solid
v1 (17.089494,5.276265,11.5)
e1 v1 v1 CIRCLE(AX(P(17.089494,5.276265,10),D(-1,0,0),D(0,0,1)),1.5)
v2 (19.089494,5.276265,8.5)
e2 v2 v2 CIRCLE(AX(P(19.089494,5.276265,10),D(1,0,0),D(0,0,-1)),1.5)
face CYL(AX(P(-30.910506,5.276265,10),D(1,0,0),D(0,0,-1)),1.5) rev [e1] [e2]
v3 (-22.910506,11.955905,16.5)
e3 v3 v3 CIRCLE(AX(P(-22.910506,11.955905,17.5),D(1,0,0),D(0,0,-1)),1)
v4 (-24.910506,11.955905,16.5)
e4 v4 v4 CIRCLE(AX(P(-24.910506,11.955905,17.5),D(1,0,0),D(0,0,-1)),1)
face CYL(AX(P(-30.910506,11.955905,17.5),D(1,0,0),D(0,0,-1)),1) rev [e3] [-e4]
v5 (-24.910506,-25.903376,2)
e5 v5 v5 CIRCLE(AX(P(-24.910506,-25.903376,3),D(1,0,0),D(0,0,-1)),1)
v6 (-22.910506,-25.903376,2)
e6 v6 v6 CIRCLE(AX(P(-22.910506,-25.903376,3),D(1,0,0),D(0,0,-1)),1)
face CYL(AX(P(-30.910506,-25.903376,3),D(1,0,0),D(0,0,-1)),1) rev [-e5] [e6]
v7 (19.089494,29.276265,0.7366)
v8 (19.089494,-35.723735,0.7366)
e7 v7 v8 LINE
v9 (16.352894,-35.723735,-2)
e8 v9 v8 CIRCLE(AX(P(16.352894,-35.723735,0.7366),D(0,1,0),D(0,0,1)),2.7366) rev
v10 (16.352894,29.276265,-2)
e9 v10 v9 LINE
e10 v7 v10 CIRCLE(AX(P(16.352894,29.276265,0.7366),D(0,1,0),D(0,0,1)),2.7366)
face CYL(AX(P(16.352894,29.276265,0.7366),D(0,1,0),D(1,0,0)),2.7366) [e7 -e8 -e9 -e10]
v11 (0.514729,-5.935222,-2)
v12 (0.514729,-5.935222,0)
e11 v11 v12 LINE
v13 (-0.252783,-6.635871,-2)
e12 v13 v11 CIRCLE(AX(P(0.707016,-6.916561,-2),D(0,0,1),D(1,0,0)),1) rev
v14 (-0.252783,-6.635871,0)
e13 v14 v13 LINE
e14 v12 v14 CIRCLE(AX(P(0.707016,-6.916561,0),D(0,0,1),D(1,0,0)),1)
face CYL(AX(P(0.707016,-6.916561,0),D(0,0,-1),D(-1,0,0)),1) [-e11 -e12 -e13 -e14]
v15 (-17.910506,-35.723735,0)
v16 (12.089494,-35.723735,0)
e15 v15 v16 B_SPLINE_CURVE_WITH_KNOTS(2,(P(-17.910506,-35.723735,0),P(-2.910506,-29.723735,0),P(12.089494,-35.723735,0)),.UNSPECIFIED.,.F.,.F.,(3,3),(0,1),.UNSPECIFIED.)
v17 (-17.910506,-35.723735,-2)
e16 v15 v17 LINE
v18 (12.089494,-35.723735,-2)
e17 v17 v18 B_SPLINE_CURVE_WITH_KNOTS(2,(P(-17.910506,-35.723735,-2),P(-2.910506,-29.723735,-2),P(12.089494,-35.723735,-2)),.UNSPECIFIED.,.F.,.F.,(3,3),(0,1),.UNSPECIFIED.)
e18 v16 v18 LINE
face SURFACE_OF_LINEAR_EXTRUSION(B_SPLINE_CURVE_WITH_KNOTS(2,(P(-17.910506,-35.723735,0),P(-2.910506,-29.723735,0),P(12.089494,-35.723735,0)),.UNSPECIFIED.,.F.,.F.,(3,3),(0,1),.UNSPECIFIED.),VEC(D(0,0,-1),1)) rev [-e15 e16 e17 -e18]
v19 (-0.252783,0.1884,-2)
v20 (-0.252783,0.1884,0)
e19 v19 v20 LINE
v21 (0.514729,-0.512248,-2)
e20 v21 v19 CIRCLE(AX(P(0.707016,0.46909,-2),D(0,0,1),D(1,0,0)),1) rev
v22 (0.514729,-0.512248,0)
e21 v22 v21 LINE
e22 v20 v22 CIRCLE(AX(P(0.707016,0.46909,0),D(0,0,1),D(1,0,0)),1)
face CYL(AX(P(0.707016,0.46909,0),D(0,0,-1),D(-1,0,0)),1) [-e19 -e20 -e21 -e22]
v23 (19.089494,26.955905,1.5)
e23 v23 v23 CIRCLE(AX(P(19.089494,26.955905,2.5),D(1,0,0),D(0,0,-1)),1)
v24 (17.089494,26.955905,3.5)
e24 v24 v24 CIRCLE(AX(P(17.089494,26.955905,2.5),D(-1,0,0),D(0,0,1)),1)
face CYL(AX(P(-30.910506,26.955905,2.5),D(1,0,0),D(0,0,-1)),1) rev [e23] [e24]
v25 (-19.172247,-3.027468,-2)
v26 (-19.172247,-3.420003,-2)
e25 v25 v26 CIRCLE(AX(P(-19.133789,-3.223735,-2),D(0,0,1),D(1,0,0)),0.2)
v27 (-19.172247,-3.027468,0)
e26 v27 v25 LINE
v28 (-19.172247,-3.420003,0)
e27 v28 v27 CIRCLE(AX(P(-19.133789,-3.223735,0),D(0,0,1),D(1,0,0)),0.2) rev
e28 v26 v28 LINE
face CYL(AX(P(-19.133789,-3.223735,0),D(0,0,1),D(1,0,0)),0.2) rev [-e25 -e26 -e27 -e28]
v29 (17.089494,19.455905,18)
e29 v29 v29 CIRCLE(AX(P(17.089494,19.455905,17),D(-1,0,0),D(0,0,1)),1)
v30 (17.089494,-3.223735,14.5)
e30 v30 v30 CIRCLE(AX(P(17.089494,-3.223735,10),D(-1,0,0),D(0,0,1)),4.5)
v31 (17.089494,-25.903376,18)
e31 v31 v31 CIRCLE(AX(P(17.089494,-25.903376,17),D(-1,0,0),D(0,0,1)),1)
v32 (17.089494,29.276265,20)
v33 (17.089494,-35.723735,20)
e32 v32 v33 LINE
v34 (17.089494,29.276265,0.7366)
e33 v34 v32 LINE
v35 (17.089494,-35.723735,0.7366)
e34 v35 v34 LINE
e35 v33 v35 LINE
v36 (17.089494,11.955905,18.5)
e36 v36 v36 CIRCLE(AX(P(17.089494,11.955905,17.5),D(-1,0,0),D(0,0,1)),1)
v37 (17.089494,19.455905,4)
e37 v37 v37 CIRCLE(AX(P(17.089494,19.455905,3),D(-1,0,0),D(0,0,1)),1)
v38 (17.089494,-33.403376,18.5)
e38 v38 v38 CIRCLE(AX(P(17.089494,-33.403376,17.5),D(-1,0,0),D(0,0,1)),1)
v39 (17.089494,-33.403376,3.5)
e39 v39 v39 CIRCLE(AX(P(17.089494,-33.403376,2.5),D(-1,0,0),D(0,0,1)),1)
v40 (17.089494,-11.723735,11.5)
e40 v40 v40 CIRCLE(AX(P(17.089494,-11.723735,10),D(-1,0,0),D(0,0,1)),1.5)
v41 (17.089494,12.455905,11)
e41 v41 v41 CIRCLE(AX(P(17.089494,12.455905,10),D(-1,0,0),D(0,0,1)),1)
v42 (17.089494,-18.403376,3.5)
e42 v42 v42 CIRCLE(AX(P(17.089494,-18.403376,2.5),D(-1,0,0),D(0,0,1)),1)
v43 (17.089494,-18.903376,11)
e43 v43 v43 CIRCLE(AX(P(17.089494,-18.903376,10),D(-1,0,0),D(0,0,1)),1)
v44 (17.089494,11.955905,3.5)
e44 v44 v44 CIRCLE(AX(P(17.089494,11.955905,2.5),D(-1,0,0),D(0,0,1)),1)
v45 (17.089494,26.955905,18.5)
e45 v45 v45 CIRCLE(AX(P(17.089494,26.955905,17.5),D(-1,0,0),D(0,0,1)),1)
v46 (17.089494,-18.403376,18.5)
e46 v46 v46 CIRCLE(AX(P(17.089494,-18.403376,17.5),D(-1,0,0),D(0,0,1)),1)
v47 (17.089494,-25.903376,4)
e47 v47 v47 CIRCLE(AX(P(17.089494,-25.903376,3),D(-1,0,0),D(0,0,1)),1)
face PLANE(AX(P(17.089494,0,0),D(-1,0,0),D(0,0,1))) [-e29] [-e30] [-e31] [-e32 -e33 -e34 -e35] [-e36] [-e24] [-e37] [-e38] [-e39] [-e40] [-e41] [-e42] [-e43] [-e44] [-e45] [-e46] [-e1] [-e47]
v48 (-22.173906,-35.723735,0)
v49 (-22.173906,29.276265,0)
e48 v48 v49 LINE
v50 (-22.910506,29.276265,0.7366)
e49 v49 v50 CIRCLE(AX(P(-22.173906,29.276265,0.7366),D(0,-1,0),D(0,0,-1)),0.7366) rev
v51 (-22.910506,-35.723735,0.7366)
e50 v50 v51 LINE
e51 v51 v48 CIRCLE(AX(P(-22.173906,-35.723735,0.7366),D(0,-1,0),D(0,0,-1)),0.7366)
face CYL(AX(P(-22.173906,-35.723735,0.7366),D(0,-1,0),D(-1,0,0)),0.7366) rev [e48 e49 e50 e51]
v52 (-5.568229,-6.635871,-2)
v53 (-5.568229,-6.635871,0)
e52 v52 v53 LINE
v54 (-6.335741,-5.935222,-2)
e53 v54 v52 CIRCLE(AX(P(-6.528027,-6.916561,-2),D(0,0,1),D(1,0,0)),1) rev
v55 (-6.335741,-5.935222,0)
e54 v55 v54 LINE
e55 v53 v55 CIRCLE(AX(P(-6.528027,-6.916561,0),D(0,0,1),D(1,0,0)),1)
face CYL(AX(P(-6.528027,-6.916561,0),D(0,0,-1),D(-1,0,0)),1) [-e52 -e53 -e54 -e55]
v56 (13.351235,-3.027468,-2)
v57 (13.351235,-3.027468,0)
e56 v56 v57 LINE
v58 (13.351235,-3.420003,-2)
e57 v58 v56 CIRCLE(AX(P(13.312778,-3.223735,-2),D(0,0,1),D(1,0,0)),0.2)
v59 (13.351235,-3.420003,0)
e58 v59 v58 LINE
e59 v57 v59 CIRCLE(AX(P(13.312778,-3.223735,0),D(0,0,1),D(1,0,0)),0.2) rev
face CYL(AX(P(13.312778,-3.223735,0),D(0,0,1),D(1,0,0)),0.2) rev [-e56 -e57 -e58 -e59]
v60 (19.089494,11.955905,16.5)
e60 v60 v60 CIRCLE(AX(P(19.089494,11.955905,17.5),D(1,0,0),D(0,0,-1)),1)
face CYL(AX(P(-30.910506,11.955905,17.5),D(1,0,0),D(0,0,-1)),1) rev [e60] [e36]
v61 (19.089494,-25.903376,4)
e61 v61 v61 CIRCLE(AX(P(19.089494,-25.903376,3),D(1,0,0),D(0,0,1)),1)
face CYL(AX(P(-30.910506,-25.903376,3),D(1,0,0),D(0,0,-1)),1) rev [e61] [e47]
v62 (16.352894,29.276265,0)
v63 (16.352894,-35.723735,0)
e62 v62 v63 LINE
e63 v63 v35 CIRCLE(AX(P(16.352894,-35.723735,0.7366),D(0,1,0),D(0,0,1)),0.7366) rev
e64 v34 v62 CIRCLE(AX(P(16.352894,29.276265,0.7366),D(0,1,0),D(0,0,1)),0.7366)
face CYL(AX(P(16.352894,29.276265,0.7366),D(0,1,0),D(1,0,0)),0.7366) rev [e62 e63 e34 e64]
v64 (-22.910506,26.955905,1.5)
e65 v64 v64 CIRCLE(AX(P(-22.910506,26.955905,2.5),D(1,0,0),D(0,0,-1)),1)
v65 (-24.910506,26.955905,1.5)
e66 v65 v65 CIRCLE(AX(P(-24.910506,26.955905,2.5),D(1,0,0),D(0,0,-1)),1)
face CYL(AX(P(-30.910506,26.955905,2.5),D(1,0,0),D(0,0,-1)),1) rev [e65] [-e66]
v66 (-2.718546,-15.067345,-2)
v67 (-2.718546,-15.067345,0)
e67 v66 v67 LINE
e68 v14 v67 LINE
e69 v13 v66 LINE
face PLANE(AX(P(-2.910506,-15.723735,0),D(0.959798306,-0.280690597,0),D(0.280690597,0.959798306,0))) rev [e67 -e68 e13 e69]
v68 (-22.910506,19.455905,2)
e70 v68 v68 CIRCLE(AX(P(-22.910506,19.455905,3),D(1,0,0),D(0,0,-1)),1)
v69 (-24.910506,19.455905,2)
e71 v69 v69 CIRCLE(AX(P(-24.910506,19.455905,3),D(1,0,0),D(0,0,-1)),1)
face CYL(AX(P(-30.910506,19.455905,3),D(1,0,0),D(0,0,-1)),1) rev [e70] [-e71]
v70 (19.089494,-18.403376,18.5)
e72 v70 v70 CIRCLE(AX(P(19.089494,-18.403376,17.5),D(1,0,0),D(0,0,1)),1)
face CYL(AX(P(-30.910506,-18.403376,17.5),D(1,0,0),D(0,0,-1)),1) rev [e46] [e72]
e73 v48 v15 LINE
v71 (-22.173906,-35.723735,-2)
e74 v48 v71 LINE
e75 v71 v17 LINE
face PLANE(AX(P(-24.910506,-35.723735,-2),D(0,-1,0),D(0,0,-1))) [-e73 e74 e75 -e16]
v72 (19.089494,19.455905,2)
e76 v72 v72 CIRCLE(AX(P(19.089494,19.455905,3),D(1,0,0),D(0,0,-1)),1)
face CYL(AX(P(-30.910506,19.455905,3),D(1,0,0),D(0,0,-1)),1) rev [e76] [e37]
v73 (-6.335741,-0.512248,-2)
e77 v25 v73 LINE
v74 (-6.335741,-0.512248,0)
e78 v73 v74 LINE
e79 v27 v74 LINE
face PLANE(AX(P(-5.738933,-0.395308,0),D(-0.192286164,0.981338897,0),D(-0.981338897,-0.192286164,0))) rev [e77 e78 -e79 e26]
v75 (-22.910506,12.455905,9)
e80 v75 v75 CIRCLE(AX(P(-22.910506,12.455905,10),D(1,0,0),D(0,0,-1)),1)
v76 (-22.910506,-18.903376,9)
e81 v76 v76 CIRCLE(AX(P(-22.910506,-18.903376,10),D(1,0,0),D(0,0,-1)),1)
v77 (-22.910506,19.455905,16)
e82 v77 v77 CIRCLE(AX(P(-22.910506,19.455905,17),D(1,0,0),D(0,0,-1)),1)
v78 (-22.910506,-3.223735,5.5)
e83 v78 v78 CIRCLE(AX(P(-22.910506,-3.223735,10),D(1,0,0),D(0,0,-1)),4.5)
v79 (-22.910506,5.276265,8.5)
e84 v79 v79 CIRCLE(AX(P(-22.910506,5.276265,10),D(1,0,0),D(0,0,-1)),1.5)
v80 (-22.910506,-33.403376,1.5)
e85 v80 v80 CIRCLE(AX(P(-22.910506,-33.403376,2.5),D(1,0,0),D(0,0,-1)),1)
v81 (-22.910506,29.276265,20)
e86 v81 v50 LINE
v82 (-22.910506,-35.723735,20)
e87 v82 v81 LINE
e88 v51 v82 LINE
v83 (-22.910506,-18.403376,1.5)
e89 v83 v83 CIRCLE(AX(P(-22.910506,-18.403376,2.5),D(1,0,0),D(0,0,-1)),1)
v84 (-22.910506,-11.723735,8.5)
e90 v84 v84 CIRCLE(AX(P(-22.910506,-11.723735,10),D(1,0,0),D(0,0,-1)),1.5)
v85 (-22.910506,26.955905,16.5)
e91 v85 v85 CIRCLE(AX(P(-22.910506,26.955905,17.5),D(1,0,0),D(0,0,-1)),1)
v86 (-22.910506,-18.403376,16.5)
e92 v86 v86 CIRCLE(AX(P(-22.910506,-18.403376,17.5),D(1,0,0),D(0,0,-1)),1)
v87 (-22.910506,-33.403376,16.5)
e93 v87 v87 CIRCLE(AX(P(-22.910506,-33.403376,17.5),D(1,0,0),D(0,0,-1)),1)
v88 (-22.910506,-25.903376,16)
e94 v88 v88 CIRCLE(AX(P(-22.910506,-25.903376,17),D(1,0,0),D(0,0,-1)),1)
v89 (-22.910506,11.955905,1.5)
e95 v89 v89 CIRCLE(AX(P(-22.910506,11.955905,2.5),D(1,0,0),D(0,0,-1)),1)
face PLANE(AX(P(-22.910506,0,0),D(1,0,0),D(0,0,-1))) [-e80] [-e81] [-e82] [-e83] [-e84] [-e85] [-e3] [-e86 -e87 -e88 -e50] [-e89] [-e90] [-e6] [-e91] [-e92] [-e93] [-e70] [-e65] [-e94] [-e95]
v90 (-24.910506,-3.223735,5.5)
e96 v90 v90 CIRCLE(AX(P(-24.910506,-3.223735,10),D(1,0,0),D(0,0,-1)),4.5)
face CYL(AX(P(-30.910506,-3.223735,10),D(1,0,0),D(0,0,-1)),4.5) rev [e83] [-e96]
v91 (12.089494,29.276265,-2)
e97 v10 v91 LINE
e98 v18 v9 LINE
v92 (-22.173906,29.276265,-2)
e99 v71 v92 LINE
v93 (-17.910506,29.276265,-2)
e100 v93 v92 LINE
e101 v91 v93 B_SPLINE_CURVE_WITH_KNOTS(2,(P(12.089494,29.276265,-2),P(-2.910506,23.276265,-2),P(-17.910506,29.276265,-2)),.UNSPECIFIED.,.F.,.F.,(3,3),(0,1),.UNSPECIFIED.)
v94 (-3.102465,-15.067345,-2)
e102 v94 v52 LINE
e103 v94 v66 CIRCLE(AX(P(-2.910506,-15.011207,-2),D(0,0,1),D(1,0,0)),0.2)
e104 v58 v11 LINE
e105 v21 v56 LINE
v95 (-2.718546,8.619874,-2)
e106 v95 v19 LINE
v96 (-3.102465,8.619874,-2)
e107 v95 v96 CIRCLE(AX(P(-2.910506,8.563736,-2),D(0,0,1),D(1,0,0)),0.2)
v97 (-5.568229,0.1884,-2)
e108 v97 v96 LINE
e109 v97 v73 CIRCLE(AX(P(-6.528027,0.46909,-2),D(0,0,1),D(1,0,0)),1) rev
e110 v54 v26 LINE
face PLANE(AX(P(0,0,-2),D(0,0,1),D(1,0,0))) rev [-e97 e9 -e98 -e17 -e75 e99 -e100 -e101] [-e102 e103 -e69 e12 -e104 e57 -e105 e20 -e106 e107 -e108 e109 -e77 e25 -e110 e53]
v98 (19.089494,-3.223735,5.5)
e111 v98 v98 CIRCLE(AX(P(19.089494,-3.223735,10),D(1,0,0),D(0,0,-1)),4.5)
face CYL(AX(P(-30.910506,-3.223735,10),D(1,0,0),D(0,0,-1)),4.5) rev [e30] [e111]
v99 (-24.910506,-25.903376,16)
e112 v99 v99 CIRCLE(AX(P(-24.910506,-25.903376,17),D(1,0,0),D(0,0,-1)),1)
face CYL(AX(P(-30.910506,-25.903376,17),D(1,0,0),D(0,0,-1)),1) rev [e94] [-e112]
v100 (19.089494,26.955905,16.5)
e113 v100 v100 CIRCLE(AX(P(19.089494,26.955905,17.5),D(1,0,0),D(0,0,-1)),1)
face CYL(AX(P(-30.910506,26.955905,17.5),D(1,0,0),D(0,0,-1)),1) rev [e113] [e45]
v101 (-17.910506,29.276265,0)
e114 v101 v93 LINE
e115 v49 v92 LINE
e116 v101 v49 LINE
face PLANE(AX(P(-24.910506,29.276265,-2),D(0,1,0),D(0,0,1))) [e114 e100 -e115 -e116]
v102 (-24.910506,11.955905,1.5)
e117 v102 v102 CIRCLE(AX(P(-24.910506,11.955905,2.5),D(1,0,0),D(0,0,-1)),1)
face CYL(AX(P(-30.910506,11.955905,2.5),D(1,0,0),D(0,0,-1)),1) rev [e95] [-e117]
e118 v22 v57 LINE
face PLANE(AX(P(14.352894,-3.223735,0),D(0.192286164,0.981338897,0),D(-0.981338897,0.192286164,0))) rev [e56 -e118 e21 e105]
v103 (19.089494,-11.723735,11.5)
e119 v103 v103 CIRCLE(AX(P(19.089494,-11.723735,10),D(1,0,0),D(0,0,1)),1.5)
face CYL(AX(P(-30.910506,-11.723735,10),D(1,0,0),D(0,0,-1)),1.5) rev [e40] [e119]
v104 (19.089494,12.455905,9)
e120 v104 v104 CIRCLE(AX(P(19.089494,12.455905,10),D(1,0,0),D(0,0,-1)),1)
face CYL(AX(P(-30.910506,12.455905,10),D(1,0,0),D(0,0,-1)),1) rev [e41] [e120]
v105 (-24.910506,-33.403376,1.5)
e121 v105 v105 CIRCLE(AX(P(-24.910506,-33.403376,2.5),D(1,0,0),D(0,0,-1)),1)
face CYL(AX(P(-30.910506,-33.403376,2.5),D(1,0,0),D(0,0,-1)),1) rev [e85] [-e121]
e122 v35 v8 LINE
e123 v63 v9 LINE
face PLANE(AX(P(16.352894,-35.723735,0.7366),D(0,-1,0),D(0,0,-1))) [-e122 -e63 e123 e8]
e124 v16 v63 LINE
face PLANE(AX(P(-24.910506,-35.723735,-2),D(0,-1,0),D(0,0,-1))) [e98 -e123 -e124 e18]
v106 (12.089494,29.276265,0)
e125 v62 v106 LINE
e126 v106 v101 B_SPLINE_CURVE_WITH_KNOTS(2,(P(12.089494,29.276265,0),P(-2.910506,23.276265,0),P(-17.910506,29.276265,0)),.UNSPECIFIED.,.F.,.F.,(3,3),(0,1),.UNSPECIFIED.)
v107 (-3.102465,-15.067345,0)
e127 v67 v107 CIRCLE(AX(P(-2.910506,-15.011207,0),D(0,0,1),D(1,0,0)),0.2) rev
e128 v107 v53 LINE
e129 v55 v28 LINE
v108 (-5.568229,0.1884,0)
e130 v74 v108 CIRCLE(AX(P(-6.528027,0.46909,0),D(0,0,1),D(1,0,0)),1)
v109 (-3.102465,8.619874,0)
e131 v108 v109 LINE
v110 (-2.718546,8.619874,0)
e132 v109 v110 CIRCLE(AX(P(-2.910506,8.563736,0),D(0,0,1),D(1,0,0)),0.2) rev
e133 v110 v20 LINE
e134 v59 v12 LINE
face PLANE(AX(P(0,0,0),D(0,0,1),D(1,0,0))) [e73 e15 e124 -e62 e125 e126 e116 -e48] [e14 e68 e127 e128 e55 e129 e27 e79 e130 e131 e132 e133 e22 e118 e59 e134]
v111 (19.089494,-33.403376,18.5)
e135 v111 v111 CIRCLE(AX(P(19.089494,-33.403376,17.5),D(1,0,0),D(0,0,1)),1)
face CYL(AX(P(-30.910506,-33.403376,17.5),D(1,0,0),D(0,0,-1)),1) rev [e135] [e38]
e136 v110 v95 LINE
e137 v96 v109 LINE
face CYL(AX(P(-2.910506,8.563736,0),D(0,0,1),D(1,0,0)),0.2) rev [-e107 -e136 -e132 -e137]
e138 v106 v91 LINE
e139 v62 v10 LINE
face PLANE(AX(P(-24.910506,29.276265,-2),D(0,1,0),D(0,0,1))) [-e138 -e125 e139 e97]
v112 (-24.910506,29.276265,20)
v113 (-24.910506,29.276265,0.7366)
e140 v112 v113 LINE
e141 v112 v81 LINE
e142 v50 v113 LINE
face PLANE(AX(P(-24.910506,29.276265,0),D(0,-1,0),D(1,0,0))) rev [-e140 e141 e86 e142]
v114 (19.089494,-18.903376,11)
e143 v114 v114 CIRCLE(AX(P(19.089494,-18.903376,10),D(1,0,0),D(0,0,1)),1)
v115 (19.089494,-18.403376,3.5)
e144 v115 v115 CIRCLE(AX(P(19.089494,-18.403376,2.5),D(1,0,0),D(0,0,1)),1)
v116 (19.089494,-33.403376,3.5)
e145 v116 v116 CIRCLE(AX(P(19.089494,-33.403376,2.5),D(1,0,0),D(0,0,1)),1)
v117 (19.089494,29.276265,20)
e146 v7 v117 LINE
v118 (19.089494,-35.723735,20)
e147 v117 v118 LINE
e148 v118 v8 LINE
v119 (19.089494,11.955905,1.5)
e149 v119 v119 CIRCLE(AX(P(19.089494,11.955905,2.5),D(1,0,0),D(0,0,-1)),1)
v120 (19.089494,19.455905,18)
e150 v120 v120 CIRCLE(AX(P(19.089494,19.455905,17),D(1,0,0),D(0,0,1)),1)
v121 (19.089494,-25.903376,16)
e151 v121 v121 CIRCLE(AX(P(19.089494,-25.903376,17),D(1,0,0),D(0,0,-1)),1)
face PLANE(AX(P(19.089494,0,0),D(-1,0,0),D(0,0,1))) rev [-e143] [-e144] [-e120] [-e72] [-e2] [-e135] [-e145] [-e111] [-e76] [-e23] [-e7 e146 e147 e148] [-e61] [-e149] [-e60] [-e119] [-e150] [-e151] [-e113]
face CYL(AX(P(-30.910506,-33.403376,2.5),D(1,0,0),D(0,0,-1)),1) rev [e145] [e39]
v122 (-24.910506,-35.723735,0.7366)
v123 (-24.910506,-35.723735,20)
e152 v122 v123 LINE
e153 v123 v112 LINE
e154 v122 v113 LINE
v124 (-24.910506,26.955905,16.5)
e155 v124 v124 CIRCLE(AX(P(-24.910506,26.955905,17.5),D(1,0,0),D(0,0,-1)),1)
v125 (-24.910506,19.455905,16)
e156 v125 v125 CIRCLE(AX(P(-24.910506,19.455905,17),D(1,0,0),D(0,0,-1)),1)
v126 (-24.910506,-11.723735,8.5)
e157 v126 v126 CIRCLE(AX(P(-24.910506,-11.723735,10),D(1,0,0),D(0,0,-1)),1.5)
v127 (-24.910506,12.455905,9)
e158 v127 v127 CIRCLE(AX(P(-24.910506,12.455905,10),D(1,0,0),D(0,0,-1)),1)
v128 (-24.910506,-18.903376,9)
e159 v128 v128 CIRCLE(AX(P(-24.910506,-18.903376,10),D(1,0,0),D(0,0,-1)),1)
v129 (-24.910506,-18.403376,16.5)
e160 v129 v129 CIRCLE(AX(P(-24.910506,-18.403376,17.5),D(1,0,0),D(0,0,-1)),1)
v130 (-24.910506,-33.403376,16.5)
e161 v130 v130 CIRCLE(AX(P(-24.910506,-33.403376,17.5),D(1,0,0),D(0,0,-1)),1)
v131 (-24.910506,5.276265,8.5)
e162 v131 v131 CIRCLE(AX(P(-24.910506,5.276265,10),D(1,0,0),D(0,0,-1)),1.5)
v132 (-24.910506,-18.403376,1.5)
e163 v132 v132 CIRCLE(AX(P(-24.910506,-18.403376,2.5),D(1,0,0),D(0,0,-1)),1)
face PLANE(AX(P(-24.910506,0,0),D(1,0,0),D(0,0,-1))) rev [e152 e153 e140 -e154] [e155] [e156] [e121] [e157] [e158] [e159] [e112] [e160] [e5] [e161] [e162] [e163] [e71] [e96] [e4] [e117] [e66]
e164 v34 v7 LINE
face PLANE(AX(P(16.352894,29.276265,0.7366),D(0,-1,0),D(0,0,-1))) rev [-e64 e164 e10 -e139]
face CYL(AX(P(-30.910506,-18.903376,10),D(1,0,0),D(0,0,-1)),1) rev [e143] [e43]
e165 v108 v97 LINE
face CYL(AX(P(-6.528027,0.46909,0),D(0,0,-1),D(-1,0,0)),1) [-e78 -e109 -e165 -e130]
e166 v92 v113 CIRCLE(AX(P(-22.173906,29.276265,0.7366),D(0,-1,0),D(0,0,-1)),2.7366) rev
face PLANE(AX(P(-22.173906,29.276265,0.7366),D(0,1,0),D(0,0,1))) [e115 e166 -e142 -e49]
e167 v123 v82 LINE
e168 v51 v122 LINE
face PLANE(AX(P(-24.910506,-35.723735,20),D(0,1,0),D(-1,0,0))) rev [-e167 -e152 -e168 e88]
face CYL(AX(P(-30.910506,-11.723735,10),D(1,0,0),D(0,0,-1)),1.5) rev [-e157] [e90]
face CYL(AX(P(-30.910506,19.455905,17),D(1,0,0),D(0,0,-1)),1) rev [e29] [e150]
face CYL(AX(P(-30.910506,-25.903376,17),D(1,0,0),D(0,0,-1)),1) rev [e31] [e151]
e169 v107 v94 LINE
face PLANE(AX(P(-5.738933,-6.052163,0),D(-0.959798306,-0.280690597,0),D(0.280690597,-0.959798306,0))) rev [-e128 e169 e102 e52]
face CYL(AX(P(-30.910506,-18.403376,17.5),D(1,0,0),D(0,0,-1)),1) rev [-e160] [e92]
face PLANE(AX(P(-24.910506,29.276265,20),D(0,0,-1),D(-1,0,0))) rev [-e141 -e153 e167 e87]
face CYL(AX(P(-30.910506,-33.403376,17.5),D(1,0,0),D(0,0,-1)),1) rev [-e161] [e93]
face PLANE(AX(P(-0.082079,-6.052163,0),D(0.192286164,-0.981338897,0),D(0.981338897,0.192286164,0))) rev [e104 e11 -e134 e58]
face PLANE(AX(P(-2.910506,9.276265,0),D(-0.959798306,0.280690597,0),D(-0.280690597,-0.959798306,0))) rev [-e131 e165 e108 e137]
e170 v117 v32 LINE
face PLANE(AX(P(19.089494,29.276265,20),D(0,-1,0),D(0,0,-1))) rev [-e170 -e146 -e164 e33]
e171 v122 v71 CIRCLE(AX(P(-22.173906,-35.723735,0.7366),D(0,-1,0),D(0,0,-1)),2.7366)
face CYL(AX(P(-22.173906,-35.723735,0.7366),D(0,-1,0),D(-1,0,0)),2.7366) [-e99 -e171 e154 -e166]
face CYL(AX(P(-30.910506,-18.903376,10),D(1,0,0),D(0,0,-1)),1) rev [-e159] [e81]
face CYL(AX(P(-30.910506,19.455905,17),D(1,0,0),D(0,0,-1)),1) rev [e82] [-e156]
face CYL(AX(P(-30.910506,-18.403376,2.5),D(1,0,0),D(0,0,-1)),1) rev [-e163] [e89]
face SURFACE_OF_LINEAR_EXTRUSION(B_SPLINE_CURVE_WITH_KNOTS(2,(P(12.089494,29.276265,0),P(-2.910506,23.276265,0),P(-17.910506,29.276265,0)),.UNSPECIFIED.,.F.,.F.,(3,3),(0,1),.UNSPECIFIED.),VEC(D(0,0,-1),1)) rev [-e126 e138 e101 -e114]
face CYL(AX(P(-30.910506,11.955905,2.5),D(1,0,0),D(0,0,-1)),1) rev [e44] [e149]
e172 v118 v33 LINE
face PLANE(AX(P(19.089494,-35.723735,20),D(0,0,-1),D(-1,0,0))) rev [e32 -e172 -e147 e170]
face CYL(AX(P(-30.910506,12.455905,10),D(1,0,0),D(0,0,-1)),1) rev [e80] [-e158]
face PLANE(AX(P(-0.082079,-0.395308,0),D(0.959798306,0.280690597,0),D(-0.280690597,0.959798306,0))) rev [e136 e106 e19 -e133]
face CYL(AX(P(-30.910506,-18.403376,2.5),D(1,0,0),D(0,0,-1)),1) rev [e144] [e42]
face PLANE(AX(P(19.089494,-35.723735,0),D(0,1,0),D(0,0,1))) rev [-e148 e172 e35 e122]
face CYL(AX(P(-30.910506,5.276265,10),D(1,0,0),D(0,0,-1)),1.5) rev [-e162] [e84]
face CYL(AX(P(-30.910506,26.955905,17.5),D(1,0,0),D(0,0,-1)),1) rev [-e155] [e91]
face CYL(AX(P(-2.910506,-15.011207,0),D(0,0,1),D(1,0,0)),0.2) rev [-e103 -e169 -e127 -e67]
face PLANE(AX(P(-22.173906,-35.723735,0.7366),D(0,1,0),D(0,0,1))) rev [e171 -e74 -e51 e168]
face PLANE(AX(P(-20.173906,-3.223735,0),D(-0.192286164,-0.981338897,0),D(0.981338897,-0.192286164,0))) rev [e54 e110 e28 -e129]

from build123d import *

# Parameters (mm, degrees)
SKETCH_1_W                       = 44
SKETCH_1_H                       = 65
SM_BASE_FLANGE_1_DEPTH           = 2
SM_EDGE_FLANGE_1_STRIP_W         = 9.4732
SM_EDGE_FLANGE_1_STRIP_H         = 2
SM_EDGE_FLANGE_1_STRIP_CUT_DEPTH = 65
SM_EDGE_FLANGE_1_DEPTH           = 65
SM_EDGE_FLANGE_2_STRIP_W         = 9.4732
SM_EDGE_FLANGE_2_STRIP_H         = 2
SM_EDGE_FLANGE_2_STRIP_CUT_DEPTH = 65
SM_EDGE_FLANGE_2_DEPTH           = 65
CUT_EXTRUDE_1_DEPTH              = 2
CUT_EXTRUDE_2_DEPTH              = 2
CUT_EXTRUDE_3_DEPTH              = 2
SKETCH_16_R                      = 1
SKETCH_16_R_2                    = 4.5
SKETCH_16_R_3                    = 1.5
CUT_EXTRUDE_5_DEPTH              = 50
FILLET_2_R                       = 0.2
FILLET_3_R                       = 0.2
FILLET_4_R                       = 0.2
FILLET_5_R                       = 0.2
FILLET_7_R                       = 1


# Sheet-metal steps are written as plain solids
with BuildPart() as part:
    # Sketch 1 → 基体-法兰1 (new body)
    with BuildSketch(Plane.XY):
        with Locations((-2.910505837, -3.223735409)):
            Rectangle(SKETCH_1_W, SKETCH_1_H)
    extrude(amount=-SM_BASE_FLANGE_1_DEPTH)

    # 边线-法兰1 strip (across the edge) → 边线-法兰1 strip cut (cut)
    with BuildSketch(Plane(origin=(-24.910505837, 29.276264591, 0), x_dir=(1, 0, 0), z_dir=(0, -1, 0))):
        with Locations((-2, -1)):
            Rectangle(SM_EDGE_FLANGE_1_STRIP_W, SM_EDGE_FLANGE_1_STRIP_H)
    extrude(amount=SM_EDGE_FLANGE_1_STRIP_CUT_DEPTH, mode=Mode.SUBTRACT)

    # 边线-法兰1 section (across the edge) → 边线-法兰1 (add)
    with BuildSketch(Plane(origin=(-24.910505837, 29.276264591, 0), x_dir=(1, 0, 0), z_dir=(0, -1, 0))):
        with BuildLine():
            Line((0, 0.7366), (0, 20))
            Line((0, 20), (2, 20))
            Line((2, 20), (2, 0.7366))
            ThreePointArc((2, 0.7366), (2.215745145, 0.215745145), (2.7366, 0))
            Line((2.7366, 0), (2.7366, -2))
            ThreePointArc((2.7366, -2), (0.801531583, -1.198468417), (0, 0.7366))
        make_face()
    extrude(amount=SM_EDGE_FLANGE_1_DEPTH)

    # 边线-法兰2 strip (across the edge) → 边线-法兰2 strip cut (cut)
    with BuildSketch(Plane(origin=(19.089494163, -35.723735409, 0), x_dir=(-1, 0, 0), z_dir=(0, 1, 0))):
        with Locations((-2, -1)):
            Rectangle(SM_EDGE_FLANGE_2_STRIP_W, SM_EDGE_FLANGE_2_STRIP_H)
    extrude(amount=SM_EDGE_FLANGE_2_STRIP_CUT_DEPTH, mode=Mode.SUBTRACT)

    # 边线-法兰2 section (across the edge) → 边线-法兰2 (add)
    with BuildSketch(Plane(origin=(19.089494163, -35.723735409, 0), x_dir=(-1, 0, 0), z_dir=(0, 1, 0))):
        with BuildLine():
            Line((0, 0.7366), (0, 20))
            Line((0, 20), (2, 20))
            Line((2, 20), (2, 0.7366))
            ThreePointArc((2, 0.7366), (2.215745145, 0.215745145), (2.7366, 0))
            Line((2.7366, 0), (2.7366, -2))
            ThreePointArc((2.7366, -2), (0.801531583, -1.198468417), (0, 0.7366))
        make_face()
    extrude(amount=SM_EDGE_FLANGE_2_DEPTH)

    # 草图12 → 切除-拉伸1 (cut)
    with BuildSketch(Plane(origin=(0, 0, -2), x_dir=(-1, 0, 0), z_dir=(0, 0, -1))):
        Polygon((-14.352894163, -3.223735409), (0.082078712, -0.395308284), (2.910505837, 9.276264591), (5.738932961, -0.395308284), (20.173905837, -3.223735409), (5.738932961, -6.052162533), (2.910505837, -15.723735409), (0.082078712, -6.052162533), align=None)
    extrude(amount=-CUT_EXTRUDE_1_DEPTH, mode=Mode.SUBTRACT)

    # 草图13 → 切除-拉伸2 (cut)
    with BuildSketch(Plane(origin=(0, 0, -2), x_dir=(-1, 0, 0), z_dir=(0, 0, -1))):
        with BuildLine():
            Line((2.910505837, 29.276264591), (17.910505837, 29.276264591))
            add(Edge.make_bspline(
                [(-12.089494163, 29.276264591), (2.910505837, 23.276264591), (17.910505837, 29.276264591)],
                knots=[0, 0, 0, 1, 1, 1], degree=2))
            Line((-12.089494163, 29.276264591), (2.910505837, 29.276264591))
        make_face()
    extrude(amount=-CUT_EXTRUDE_2_DEPTH, mode=Mode.SUBTRACT)

    # 草图14 → 切除-拉伸3 (cut)
    with BuildSketch(Plane(origin=(0, 0, -2), x_dir=(-1, 0, 0), z_dir=(0, 0, -1))):
        with BuildLine():
            Line((2.910505837, -35.723735409), (17.910505837, -35.723735409))
            add(Edge.make_bspline(
                [(-12.089494163, -35.723735409), (2.910505837, -29.723735409), (17.910505837, -35.723735409)],
                knots=[0, 0, 0, 1, 1, 1], degree=2))
            Line((-12.089494163, -35.723735409), (2.910505837, -35.723735409))
        make_face()
    extrude(amount=-CUT_EXTRUDE_3_DEPTH, mode=Mode.SUBTRACT)

    # 草图16 → 切除-拉伸5 (cut)
    with BuildSketch(Plane(origin=(19.089494163, 0, 0), x_dir=(0, 0, -1), z_dir=(1, 0, 0))):
        with Locations((-17.5, 26.95590493)):
            Circle(SKETCH_16_R)
        with Locations((-2.5, 26.95590493)):
            Circle(SKETCH_16_R)
        with Locations((-2.5, 11.95590493)):
            Circle(SKETCH_16_R)
        with Locations((-17.5, 11.95590493)):
            Circle(SKETCH_16_R)
        with Locations((-3, 19.45590493)):
            Circle(SKETCH_16_R)
        with Locations(Location((-17, 19.45590493, 0), (0, 0, 180))):
            Circle(SKETCH_16_R)
        with Locations((-10, 12.45590493)):
            Circle(SKETCH_16_R)
        with Locations(Location((-10, -18.903375747, 0), (0, 0, 180))):
            Circle(SKETCH_16_R)
        with Locations((-17, -25.903375747)):
            Circle(SKETCH_16_R)
        with Locations(Location((-3, -25.903375747, 0), (0, 0, 180))):
            Circle(SKETCH_16_R)
        with Locations(Location((-17.5, -18.403375747, 0), (0, 0, 180))):
            Circle(SKETCH_16_R)
        with Locations(Location((-2.5, -18.403375747, 0), (0, 0, 180))):
            Circle(SKETCH_16_R)
        with Locations(Location((-2.5, -33.403375747, 0), (0, 0, 180))):
            Circle(SKETCH_16_R)
        with Locations(Location((-17.5, -33.403375747, 0), (0, 0, 180))):
            Circle(SKETCH_16_R)
        with Locations((-10, -3.223735409)):
            Circle(SKETCH_16_R_2)
        with Locations((-10, 5.276264591)):
            Circle(SKETCH_16_R_3)
        with Locations(Location((-10, -11.723735409, 0), (0, 0, 180))):
            Circle(SKETCH_16_R_3)
    extrude(amount=-CUT_EXTRUDE_5_DEPTH, mode=Mode.SUBTRACT)

    # 圆角2
    fillet_2_edges = [part.edges().sort_by_distance(p)[0] for p in [
        (-2.910505837, 9.276264591, -1),
    ]]
    fillet(fillet_2_edges, radius=FILLET_2_R)

    # 圆角3
    fillet_3_edges = [part.edges().sort_by_distance(p)[0] for p in [
        (-20.173905837, -3.223735409, -1),
    ]]
    fillet(fillet_3_edges, radius=FILLET_3_R)

    # 圆角4
    fillet_4_edges = [part.edges().sort_by_distance(p)[0] for p in [
        (-2.910505837, -15.723735409, -1),
    ]]
    fillet(fillet_4_edges, radius=FILLET_4_R)

    # 圆角5
    fillet_5_edges = [part.edges().sort_by_distance(p)[0] for p in [
        (14.352894163, -3.223735409, -1),
    ]]
    fillet(fillet_5_edges, radius=FILLET_5_R)

    # 圆角7
    fillet_7_edges = [part.edges().sort_by_distance(p)[0] for p in [
        (-0.082078712, -0.395308284, -1),
        (-5.738932961, -0.395308284, -1),
        (-5.738932961, -6.052162533, -1),
        (-0.082078712, -6.052162533, -1),
    ]]
    fillet(fillet_7_edges, radius=FILLET_7_R)


solid = part.part
